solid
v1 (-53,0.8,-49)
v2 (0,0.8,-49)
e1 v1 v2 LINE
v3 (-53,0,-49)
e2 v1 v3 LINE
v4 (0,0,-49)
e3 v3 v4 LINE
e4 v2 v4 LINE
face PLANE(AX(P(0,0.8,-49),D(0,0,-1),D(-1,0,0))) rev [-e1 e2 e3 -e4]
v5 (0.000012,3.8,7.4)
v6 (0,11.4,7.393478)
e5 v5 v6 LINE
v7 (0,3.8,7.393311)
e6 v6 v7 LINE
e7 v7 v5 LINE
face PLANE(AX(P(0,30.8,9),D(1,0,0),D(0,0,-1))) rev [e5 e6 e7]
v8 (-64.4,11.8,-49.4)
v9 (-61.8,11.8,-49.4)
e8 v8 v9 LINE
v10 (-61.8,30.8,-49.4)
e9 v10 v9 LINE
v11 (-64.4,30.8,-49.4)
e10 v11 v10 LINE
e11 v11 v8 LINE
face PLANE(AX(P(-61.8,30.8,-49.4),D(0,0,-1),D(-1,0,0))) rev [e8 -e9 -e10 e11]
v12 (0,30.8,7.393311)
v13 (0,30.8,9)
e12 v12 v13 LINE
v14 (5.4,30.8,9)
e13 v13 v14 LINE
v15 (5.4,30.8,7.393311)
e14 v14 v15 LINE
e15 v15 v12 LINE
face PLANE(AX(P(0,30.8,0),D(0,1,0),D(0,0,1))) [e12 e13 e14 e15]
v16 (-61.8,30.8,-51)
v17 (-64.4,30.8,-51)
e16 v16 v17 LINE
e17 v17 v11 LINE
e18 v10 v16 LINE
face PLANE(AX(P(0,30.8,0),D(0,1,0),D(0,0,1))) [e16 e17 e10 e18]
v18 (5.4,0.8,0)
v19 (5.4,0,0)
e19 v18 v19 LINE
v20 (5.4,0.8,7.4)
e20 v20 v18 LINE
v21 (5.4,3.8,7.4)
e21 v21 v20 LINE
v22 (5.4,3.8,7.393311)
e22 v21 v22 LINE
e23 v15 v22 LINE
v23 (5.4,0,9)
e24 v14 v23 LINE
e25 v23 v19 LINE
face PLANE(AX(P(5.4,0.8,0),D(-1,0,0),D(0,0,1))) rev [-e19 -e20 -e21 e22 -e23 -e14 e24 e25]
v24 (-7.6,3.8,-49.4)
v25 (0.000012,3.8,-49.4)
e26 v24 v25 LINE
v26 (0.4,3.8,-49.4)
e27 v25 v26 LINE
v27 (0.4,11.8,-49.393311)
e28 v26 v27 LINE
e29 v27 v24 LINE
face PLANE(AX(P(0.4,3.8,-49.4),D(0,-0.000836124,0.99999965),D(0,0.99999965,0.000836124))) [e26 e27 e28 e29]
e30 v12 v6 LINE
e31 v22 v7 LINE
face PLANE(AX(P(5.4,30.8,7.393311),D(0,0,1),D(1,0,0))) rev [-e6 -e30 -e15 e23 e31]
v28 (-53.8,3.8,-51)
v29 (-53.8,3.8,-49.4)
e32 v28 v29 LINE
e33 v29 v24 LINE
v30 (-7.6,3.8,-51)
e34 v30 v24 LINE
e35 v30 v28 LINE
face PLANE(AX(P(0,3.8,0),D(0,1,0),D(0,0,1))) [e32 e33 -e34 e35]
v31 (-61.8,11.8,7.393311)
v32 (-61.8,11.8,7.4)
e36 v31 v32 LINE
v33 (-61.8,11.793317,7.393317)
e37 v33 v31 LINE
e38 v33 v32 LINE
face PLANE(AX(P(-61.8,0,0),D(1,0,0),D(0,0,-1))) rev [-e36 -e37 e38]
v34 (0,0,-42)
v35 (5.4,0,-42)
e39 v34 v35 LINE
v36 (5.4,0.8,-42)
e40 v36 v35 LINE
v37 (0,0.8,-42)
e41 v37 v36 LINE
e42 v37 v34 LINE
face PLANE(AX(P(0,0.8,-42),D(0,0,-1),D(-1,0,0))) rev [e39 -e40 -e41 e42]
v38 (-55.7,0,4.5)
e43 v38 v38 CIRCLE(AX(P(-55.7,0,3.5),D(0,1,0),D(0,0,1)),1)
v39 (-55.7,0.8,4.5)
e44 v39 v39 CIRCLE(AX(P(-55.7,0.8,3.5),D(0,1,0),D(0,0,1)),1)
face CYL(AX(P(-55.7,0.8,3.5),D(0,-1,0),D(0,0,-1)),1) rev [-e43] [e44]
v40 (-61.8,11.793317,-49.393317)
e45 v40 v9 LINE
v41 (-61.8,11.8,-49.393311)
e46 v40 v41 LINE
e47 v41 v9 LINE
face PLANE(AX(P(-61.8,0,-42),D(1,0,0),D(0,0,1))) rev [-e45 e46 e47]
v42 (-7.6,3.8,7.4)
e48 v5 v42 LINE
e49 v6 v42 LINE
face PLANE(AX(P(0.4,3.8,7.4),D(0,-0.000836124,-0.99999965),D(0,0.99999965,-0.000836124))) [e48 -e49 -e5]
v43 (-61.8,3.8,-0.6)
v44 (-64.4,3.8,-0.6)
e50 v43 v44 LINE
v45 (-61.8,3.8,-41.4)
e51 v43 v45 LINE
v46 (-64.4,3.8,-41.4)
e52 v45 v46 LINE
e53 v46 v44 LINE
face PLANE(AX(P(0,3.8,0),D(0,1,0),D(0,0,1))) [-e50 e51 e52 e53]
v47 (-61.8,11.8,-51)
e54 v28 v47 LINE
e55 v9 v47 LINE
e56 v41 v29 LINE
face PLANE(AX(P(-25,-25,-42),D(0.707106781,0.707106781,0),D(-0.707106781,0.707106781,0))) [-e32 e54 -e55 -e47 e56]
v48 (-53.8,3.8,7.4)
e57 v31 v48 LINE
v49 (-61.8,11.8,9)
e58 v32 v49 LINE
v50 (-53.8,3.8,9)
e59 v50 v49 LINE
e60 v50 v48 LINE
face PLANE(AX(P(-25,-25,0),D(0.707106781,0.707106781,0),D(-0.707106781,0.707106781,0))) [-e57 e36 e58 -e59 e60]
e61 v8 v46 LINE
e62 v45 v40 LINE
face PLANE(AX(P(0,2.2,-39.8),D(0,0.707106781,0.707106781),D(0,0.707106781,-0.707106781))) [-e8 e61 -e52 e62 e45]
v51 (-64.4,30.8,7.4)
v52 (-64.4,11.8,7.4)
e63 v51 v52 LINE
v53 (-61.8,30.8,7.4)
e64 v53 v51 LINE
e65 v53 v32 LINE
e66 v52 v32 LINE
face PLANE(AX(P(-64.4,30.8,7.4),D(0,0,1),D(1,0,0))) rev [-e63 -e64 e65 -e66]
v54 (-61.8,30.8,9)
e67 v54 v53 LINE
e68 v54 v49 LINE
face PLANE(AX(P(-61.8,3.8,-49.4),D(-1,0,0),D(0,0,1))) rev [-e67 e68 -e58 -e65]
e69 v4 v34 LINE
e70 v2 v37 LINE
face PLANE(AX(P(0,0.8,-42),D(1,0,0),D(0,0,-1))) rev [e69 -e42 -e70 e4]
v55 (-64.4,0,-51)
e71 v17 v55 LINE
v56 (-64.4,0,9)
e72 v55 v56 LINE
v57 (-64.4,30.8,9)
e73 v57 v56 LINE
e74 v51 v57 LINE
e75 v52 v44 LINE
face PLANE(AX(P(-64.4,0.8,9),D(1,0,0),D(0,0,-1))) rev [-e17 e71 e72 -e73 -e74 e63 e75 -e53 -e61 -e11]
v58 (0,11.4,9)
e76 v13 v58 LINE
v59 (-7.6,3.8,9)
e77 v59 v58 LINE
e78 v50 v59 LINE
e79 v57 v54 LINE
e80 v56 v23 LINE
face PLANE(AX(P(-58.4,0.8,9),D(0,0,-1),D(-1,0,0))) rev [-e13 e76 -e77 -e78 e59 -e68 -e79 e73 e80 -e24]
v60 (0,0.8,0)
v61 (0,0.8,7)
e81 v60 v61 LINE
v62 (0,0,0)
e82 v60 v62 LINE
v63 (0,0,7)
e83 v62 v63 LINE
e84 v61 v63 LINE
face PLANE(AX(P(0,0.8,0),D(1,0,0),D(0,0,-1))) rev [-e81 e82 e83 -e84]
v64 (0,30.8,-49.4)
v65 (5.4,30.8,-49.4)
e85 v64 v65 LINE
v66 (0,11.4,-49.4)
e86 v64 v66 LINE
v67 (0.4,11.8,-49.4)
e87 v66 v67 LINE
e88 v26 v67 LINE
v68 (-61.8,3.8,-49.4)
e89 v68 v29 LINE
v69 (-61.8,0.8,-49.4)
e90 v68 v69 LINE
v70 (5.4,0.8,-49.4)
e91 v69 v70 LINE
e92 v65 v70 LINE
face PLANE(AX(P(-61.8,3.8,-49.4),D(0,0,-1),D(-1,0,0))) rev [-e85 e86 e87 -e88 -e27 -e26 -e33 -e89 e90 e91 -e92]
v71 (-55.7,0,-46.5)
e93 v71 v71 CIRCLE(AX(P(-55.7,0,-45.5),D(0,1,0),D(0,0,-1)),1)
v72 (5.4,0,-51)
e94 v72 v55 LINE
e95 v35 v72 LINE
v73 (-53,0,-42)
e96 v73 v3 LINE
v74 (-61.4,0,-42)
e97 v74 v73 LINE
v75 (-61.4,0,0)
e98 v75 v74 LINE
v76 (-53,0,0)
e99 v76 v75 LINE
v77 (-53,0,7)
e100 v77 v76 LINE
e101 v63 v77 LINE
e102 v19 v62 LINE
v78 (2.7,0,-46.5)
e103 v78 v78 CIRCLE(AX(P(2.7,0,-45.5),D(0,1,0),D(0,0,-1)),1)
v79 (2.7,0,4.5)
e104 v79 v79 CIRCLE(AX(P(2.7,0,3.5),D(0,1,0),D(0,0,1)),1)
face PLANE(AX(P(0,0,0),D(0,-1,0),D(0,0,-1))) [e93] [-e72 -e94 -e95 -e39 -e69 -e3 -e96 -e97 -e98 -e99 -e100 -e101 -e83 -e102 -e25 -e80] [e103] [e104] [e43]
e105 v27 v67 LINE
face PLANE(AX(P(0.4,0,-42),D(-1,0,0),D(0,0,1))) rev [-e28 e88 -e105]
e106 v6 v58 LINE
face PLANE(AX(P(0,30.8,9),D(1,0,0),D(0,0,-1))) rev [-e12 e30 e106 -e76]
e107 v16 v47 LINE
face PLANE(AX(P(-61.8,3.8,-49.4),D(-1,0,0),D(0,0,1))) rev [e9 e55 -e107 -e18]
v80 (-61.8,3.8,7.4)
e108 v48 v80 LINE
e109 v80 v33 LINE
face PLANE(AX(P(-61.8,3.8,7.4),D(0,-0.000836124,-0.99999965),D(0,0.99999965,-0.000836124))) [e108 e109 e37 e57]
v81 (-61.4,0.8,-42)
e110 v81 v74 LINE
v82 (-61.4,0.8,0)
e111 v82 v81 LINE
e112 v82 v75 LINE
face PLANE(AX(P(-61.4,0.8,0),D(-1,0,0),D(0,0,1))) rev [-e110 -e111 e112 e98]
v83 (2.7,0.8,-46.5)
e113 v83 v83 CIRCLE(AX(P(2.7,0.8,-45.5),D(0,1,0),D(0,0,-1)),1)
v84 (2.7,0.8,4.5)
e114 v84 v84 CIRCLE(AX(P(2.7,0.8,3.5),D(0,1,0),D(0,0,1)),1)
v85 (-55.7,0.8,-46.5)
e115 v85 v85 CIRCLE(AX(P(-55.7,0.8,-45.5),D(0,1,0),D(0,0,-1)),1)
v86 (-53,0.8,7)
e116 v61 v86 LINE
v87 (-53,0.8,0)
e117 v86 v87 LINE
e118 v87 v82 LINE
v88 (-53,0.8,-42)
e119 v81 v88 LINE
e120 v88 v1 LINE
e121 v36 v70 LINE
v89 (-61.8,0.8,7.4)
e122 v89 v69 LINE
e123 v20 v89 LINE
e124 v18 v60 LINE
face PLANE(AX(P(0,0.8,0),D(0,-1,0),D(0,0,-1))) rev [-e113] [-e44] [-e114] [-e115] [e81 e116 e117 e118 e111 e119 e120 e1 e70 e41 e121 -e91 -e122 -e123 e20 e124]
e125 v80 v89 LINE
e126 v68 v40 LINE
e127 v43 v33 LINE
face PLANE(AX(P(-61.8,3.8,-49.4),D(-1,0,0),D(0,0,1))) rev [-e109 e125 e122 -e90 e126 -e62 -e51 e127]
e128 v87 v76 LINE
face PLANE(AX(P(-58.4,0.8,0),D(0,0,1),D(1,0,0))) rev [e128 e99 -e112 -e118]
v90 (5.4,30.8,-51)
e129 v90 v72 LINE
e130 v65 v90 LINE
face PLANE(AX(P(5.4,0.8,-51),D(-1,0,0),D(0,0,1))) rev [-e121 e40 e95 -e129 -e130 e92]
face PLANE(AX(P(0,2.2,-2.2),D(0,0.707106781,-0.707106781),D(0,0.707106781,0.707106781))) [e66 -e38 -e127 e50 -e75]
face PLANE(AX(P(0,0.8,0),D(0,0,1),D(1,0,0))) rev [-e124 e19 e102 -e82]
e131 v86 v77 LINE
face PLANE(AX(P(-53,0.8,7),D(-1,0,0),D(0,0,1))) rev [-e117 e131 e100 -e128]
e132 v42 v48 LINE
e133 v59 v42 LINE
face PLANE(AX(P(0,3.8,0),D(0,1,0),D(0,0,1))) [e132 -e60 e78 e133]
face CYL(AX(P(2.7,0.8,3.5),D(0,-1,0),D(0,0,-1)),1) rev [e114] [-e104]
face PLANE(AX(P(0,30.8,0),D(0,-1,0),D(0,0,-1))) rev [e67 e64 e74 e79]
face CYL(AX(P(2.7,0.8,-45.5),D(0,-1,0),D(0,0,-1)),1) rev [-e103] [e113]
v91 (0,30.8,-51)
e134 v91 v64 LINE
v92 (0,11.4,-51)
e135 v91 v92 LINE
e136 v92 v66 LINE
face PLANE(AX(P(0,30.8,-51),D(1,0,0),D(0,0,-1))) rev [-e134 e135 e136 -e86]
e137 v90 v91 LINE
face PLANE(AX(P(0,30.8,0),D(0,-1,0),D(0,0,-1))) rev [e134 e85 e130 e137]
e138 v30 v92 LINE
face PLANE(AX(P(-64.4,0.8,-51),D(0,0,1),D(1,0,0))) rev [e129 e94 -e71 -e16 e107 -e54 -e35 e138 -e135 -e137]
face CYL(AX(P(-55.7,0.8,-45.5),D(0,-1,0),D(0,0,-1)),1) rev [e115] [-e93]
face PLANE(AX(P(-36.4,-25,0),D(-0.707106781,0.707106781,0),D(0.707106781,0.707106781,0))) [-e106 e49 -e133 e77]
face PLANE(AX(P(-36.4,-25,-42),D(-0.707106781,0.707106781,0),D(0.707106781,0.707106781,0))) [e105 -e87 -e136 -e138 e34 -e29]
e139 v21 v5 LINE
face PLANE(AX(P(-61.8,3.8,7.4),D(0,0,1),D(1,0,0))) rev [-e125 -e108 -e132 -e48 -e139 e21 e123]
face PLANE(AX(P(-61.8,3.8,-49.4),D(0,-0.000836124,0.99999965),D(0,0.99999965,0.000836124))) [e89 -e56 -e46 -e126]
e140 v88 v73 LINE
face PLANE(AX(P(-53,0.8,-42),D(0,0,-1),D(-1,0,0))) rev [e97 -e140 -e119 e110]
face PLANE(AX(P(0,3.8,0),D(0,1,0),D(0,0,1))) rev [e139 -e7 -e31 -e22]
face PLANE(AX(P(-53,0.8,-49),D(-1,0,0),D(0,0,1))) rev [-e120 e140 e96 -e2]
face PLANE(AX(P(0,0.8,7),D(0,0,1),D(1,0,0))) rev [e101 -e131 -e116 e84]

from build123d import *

# Parameters (mm, degrees)
SKETCH1_R            = 0.9999999999999983
SKETCH1_R_2          = 1.0000000000000002
SKETCH1_R_3          = 1.0000000000000013
BOSS_EXTRUDE1_DEPTH  = 0.8
BOSS_EXTRUDE2_DEPTH  = 3
SKETCH3_W            = 2.6000000000000014
SKETCH3_H            = 1.6000000000000156
SKETCH3_W_2          = 5.400000000000002
SKETCH3_H_2          = 1.6066889909461715
SKETCH3_H_3          = 1.6000000000000094
BOSS_EXTRUDE3_DEPTH  = 27
LOFT4_START          = 7.4
LOFT4_DEPTH          = 1.6
LOFT4_START_2        = 7.403174683
LOFT4_2_DEPTH        = 0.596825317
MIRROR6_START        = 7.4
MIRROR6_COPY_1_DEPTH = 1.6
MIRROR6_START_2      = 7.403174683
MIRROR6_COPY_2_DEPTH = 0.596825317
MIRROR6_COPY_3_DEPTH = 1.6
MIRROR6_COPY_4_DEPTH = 0.596825317


with BuildPart() as part:
    # Sketch1 → Boss-Extrude1 (new body)
    with BuildSketch(Plane(origin=(0, 0, 0), x_dir=(1, 0, 0), z_dir=(0, 1, 0))):
        Polygon((0, 0), (5.4, 0), (5.400000000000007, -7.000000000000003), (5.400000000000002, -8.999999999999995), (-58.4, -8.999999999999995), (-61.40000000000001, -8.999999999999995), (-64.4, -8.999999999999995), (-64.4, 51), (-61.40000000000001, 51), (-58.4, 51), (5.400000000000004, 50.99999999999999), (5.400000000000004, 48.99999999999999), (5.4, 42.00000000000001), (0, 41.99999999999999), (-6.07e-15, 48.99999999999999), (-53.00000000000001, 48.99999999999999), (-53.00000000000001, 41.99999999999999), (-58.400000000000006, 41.99999999999999), (-61.40000000000001, 41.99999999999999), (-61.40000000000001, 0), (-58.400000000000006, 0), (-53.00000000000001, -1.73e-15), (-53.00000000000001, -6.999999999999986), (-6.14e-15, -6.999999999999999), align=None)
        with Locations(Location((-55.70000000000001, -3.4999999999999885, 0), (0, 0, 270))):
            Circle(SKETCH1_R, mode=Mode.SUBTRACT)
        with Locations(Location((2.700000000000006, -3.499999999999999, 0), (0, 0, 270))):
            Circle(SKETCH1_R_2, mode=Mode.SUBTRACT)
        with Locations(Location((2.7000000000000015, 45.5, 0), (0, 0, 90))):
            Circle(SKETCH1_R_3, mode=Mode.SUBTRACT)
        with Locations(Location((-55.7, 45.5, 0), (0, 0, 90))):
            Circle(SKETCH1_R, mode=Mode.SUBTRACT)
    extrude(amount=BOSS_EXTRUDE1_DEPTH)

    # Sketch2 → Boss-Extrude2 (add)
    with BuildSketch(Plane(origin=(0, 0.8, 0), x_dir=(1, 0, 0), z_dir=(0, 1, 0))):
        Polygon((-64.4, 51), (5.400000000000002, 51), (5.400000000000002, 49.39999999999999), (-61.800000000000004, 49.39999999999999), (-61.800000000000004, -7.399999999999985), (5.400000000000009, -7.399999999999985), (5.400000000000002, -8.999999999999995), (-64.4, -8.999999999999995), align=None)
    extrude(amount=BOSS_EXTRUDE2_DEPTH)

    # Sketch3 → Boss-Extrude3 (add)
    with BuildSketch(Plane(origin=(0, 3.8, 0), x_dir=(1, 0, 0), z_dir=(0, 1, 0))):
        with Locations((-63.10000000000001, 50.2)):
            Rectangle(SKETCH3_W, SKETCH3_H)
        with Locations((2.700000000000001, 50.2)):
            Rectangle(SKETCH3_W_2, SKETCH3_H)
        with Locations((2.700000000000001, -8.196655504526909)):
            Rectangle(SKETCH3_W_2, SKETCH3_H_2)
        with Locations((-63.10000000000001, -8.19999999999999)):
            Rectangle(SKETCH3_W, SKETCH3_H_3)
    extrude(amount=BOSS_EXTRUDE3_DEPTH)

    # Sketch9 → Loft3 section 0
    with BuildSketch(Plane(origin=(0, 3.8, 0), x_dir=(1, 0, 0), z_dir=(0, 1, 0))):
        with BuildLine():
            Line((-64.4, -7.399999999999985), (-64.4, 0.6000000000000146))
            Line((-64.4, 0.6000000000000146), (-61.800000000000004, 0.6000000000000149))
            Line((-61.800000000000004, 0.6000000000000149), (-61.800000000000004, -7.399999999999985))
            Line((-61.800000000000004, -7.399999999999985), (-64.4, -7.399999999999985))
        make_face()
    # Sketch7 → Loft3 section 1
    with BuildSketch(Plane(origin=(0, 0, 7.399999999999985), x_dir=(-1, 0, -3.903e-14), z_dir=(3.903e-14, 0, -1))):
        with BuildLine():
            Line((64.40000000000235, 3.8), (64.4000000000023, 11.799999999999999))
            Line((64.4000000000023, 11.799999999999999), (61.80000000000229, 11.799999999999997))
            Line((61.80000000000229, 11.799999999999997), (61.80000000000229, 3.8))
            Line((61.80000000000229, 3.8), (64.40000000000235, 3.8))
        make_face()
    loft3 = loft()

    # Loft4: read off the stored shape, not the designer's step
    # Loft4 outline → Loft4 (add)
    with BuildSketch(Plane.XY.offset(LOFT4_START)):
        Polygon((-61.8, 11.8), (-61.8, 3.8), (-53.8, 3.8), align=None)
    loft4 = extrude(amount=LOFT4_DEPTH)

    # Loft4 2 outline → Loft4 2 (add)
    with BuildSketch(Plane(origin=(0, 0, 0), x_dir=(1, 0, 0), z_dir=(0, 0.0008361235760020348, 0.9999996504486218)).offset(LOFT4_START_2)):
        Polygon((-61.8, 11.793814154), (-61.8, 3.793811357), (-53.8, 3.793811357), align=None)
    loft4_2 = extrude(amount=LOFT4_2_DEPTH)

    # Mirror4: Loft3, Loft4, Loft4 2 across plane
    add(loft3.mirror(Plane.XY.offset(-20.999999999999993)))
    add(loft4.mirror(Plane.XY.offset(-20.999999999999993)))
    add(loft4_2.mirror(Plane.XY.offset(-20.999999999999993)))

    # Mirror5: Loft4, Loft4 2 across plane
    add(loft4.mirror(Plane(origin=(-30.700000000000014, 0, 0), x_dir=(0, 0, 1), z_dir=(1, 0, 0))))
    add(loft4_2.mirror(Plane(origin=(-30.700000000000014, 0, 0), x_dir=(0, 0, 1), z_dir=(1, 0, 0))))

    # Mirror6 copy 1 sketch → Mirror6 copy 1 (add)
    with BuildSketch(Plane(origin=(-61.40000000000003, 0, -41.999999999999986), x_dir=(-1, 0, 0), z_dir=(0, 0, -1)).offset(MIRROR6_START)):
        Polygon((-61.8, 11.8), (-61.8, 3.8), (-53.8, 3.8), align=None)
    extrude(amount=MIRROR6_COPY_1_DEPTH)

    # Mirror6 copy 2 sketch → Mirror6 copy 2 (add)
    with BuildSketch(Plane(origin=(-61.40000000000003, 0, -41.999999999999986), x_dir=(-1, 0, 0), z_dir=(0, 0.0008361235760020348, -0.9999996504486218)).offset(MIRROR6_START_2)):
        Polygon((-61.8, 11.793814154), (-61.8, 3.793811357), (-53.8, 3.793811357), align=None)
    extrude(amount=MIRROR6_COPY_2_DEPTH)

    # Mirror6 copy 3 sketch → Mirror6 copy 3 (add)
    with BuildSketch(Plane(origin=(0, 0, -41.999999999999986), x_dir=(1, 0, 0), z_dir=(0, 0, -1)).offset(MIRROR6_START)):
        Polygon((-61.8, -11.8), (-61.8, -3.8), (-53.8, -3.8), align=None)
    extrude(amount=MIRROR6_COPY_3_DEPTH)

    # Mirror6 copy 4 sketch → Mirror6 copy 4 (add)
    with BuildSketch(Plane(origin=(0, 0, -41.999999999999986), x_dir=(1, 0, 0), z_dir=(0, 0.0008361235760020348, -0.9999996504486218)).offset(MIRROR6_START_2)):
        Polygon((-61.8, -11.793814154), (-61.8, -3.793811357), (-53.8, -3.793811357), align=None)
    extrude(amount=MIRROR6_COPY_4_DEPTH)


solid = part.part
